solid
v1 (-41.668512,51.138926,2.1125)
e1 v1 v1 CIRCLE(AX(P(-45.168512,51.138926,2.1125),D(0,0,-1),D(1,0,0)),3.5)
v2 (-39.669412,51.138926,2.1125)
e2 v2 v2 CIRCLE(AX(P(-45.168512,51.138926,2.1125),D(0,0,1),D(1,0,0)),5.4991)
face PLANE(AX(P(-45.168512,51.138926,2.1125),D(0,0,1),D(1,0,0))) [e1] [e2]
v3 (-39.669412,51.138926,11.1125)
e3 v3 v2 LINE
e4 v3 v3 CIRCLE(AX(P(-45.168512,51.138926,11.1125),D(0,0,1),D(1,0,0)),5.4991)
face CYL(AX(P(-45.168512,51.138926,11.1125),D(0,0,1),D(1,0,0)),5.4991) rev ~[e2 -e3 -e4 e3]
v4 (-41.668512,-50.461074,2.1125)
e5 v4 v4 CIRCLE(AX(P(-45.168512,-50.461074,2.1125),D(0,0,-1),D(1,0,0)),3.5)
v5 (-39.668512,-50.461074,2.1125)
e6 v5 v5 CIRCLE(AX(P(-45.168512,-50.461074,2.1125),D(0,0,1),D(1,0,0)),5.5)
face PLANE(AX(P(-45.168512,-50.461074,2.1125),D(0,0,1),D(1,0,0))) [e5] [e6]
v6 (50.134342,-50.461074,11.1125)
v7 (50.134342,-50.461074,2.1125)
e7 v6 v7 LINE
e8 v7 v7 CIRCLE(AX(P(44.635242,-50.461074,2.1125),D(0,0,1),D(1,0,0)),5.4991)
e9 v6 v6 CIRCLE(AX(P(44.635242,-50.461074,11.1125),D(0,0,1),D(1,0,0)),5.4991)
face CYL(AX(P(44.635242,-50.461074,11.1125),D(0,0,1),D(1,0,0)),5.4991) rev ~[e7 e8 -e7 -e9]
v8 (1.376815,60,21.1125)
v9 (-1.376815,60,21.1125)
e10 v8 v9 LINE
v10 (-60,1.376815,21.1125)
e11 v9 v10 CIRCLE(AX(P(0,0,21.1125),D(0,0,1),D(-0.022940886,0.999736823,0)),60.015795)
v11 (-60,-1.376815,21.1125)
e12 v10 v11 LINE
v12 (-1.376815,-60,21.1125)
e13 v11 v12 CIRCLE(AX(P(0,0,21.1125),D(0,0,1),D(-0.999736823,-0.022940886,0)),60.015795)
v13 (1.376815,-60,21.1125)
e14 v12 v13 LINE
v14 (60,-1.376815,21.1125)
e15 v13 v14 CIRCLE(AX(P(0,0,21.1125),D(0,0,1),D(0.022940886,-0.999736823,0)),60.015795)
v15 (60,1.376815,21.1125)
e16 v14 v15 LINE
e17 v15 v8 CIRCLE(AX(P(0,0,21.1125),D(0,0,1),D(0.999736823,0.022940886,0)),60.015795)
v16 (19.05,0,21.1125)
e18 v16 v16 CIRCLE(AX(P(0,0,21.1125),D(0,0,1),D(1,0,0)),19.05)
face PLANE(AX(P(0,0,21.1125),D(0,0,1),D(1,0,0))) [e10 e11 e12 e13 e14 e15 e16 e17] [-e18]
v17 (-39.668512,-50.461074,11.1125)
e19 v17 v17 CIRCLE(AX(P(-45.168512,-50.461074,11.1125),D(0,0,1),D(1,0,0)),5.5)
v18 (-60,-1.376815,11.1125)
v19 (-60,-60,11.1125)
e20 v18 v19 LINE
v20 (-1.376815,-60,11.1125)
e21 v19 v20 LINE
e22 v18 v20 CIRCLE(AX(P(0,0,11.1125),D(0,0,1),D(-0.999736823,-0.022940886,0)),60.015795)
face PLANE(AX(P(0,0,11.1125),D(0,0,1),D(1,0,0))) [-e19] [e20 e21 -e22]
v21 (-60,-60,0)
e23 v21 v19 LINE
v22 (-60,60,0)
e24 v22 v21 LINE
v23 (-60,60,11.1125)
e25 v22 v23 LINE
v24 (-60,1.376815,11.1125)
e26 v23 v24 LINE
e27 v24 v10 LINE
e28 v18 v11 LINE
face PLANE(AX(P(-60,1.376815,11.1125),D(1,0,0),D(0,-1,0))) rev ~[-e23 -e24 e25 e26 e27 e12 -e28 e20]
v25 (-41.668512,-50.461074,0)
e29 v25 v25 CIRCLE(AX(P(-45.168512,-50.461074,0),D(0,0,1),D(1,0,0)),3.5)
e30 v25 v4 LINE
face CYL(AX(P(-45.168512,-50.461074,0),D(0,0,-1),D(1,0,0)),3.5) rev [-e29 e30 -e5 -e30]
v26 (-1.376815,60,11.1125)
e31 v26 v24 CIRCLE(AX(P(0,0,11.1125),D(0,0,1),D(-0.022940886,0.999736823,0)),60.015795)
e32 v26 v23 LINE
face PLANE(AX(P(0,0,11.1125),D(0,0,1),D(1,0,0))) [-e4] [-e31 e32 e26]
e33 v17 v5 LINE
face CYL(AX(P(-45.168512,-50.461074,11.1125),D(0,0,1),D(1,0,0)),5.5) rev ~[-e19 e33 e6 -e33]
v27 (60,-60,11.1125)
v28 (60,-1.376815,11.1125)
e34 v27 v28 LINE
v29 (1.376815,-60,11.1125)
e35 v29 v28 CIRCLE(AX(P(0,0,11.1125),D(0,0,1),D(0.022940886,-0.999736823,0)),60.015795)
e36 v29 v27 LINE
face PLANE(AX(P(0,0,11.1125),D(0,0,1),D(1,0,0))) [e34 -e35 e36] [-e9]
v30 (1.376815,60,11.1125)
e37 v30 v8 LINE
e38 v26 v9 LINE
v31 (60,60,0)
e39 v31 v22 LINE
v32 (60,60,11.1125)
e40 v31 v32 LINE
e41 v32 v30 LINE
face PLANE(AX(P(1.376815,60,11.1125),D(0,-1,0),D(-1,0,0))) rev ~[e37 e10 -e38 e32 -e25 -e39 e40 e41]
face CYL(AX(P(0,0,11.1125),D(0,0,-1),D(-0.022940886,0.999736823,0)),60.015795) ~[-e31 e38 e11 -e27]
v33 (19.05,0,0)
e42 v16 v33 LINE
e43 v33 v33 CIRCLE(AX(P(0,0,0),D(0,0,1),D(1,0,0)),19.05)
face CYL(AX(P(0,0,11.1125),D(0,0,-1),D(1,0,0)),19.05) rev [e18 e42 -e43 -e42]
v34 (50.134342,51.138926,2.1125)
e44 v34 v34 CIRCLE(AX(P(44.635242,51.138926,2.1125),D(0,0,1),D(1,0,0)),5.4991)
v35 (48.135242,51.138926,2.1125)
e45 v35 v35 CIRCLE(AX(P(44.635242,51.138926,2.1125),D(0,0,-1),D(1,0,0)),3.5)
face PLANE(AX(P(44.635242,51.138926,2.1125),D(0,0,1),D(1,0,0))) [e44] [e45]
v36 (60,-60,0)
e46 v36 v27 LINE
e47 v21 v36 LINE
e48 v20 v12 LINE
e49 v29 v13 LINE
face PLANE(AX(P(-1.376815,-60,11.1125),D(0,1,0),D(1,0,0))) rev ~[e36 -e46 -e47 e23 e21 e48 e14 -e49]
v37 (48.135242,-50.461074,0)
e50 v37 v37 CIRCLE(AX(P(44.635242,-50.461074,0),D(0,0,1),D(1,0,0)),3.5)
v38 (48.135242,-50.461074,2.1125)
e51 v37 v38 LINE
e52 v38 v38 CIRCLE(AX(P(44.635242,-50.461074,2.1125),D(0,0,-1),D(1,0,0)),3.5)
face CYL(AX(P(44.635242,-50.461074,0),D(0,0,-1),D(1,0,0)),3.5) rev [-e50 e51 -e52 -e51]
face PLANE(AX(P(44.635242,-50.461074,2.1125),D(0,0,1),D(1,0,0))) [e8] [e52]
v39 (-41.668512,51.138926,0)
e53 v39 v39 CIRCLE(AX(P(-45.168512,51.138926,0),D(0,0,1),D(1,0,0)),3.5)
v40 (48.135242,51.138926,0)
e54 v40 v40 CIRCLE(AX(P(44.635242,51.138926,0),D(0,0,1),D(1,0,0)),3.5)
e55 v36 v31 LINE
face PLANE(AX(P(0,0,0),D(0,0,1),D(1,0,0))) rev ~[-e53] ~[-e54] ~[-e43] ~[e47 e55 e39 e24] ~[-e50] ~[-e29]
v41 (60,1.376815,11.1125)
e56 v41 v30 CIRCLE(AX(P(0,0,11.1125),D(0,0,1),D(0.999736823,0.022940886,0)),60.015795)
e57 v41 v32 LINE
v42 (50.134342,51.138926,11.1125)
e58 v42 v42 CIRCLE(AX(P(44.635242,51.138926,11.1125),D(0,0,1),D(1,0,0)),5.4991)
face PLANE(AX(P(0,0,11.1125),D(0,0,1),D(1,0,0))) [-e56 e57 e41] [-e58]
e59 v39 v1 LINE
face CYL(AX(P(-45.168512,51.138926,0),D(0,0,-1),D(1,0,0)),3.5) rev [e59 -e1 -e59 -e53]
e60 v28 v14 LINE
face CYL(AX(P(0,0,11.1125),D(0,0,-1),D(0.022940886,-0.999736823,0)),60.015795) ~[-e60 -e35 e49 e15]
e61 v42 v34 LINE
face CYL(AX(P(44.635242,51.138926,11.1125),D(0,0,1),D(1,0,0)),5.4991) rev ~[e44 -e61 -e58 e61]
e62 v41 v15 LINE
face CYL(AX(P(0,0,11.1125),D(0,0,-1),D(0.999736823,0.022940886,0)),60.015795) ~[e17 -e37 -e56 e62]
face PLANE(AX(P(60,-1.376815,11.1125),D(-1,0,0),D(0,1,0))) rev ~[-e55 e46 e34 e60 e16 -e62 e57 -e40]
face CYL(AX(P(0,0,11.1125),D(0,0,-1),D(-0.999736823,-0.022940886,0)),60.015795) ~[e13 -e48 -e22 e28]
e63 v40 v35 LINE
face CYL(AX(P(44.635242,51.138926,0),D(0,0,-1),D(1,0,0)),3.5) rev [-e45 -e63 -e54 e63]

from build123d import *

# Parameters (mm, degrees)
F0_R     = 3.5
F0_R_2   = 19.05
F1_DEPTH = 11.1125
F2_R     = 5.5
F2_R_2   = 5.4991
F3_DEPTH = 9
F4_R     = 19.05
F5_DEPTH = 10


# Not quite as in the source:
# - a length typed as a fraction of an inch, garbled in the dataset ("3 / 203.2 mm" for 3/8 in), is restored


with BuildPart() as f1:
    # F0 (on Top) → F1 (new body)
    with BuildSketch(Plane.XY):
        Polygon((0, 60), (-60, 60), (-60, -60), (60, -60), (60, 0), (60, 60), align=None)
        with Locations((-45.1685115695, -50.4610737026)):
            Circle(F0_R, mode=Mode.SUBTRACT)
        with Locations((44.6352420051, -50.4610737026)):
            Circle(F0_R, mode=Mode.SUBTRACT)
        with Locations((-45.1685115695, 51.1389262974)):
            Circle(F0_R, mode=Mode.SUBTRACT)
        Circle(F0_R_2, mode=Mode.SUBTRACT)
        with Locations((44.6352420051, 51.1389262974)):
            Circle(F0_R, mode=Mode.SUBTRACT)
    extrude(amount=F1_DEPTH)

    # F2 (on face) → F3 (cut)
    with BuildSketch(Plane.XY.offset(11.1125)):
        with Locations((-45.1685115695, -50.4610737026)):
            Circle(F2_R)
        with Locations((44.6352420051, -50.4610737026)):
            Circle(F2_R_2)
        with Locations((44.6352420051, 51.1389262974)):
            Circle(F2_R_2)
        with Locations((-45.1685115695, 51.1389262974)):
            Circle(F2_R_2)
    extrude(amount=-F3_DEPTH, mode=Mode.SUBTRACT)

    # F4 (on face) → F5 (join)
    with BuildSketch(Plane.XY.offset(11.1125)):
        with BuildLine():
            Line((60, -1.3768154949), (60, 1.3768154949))
            ThreePointArc((60, 1.3768154949), (42.4375754545, 42.4375754545), (1.3768154949, 60))
            Line((1.3768154949, 60), (-1.3768154949, 60))
            ThreePointArc((-1.3768154949, 60), (-42.4375754545, 42.4375754545), (-60, 1.3768154949))
            Line((-60, 1.3768154949), (-60, -1.3768154949))
            ThreePointArc((-60, -1.3768154949), (-42.4375754545, -42.4375754545), (-1.3768154949, -60))
            Line((-1.3768154949, -60), (1.3768154949, -60))
            ThreePointArc((1.3768154949, -60), (42.4375754545, -42.4375754545), (60, -1.3768154949))
        make_face()
        Circle(F4_R, mode=Mode.SUBTRACT)
    extrude(amount=F5_DEPTH)


solid = f1.part
